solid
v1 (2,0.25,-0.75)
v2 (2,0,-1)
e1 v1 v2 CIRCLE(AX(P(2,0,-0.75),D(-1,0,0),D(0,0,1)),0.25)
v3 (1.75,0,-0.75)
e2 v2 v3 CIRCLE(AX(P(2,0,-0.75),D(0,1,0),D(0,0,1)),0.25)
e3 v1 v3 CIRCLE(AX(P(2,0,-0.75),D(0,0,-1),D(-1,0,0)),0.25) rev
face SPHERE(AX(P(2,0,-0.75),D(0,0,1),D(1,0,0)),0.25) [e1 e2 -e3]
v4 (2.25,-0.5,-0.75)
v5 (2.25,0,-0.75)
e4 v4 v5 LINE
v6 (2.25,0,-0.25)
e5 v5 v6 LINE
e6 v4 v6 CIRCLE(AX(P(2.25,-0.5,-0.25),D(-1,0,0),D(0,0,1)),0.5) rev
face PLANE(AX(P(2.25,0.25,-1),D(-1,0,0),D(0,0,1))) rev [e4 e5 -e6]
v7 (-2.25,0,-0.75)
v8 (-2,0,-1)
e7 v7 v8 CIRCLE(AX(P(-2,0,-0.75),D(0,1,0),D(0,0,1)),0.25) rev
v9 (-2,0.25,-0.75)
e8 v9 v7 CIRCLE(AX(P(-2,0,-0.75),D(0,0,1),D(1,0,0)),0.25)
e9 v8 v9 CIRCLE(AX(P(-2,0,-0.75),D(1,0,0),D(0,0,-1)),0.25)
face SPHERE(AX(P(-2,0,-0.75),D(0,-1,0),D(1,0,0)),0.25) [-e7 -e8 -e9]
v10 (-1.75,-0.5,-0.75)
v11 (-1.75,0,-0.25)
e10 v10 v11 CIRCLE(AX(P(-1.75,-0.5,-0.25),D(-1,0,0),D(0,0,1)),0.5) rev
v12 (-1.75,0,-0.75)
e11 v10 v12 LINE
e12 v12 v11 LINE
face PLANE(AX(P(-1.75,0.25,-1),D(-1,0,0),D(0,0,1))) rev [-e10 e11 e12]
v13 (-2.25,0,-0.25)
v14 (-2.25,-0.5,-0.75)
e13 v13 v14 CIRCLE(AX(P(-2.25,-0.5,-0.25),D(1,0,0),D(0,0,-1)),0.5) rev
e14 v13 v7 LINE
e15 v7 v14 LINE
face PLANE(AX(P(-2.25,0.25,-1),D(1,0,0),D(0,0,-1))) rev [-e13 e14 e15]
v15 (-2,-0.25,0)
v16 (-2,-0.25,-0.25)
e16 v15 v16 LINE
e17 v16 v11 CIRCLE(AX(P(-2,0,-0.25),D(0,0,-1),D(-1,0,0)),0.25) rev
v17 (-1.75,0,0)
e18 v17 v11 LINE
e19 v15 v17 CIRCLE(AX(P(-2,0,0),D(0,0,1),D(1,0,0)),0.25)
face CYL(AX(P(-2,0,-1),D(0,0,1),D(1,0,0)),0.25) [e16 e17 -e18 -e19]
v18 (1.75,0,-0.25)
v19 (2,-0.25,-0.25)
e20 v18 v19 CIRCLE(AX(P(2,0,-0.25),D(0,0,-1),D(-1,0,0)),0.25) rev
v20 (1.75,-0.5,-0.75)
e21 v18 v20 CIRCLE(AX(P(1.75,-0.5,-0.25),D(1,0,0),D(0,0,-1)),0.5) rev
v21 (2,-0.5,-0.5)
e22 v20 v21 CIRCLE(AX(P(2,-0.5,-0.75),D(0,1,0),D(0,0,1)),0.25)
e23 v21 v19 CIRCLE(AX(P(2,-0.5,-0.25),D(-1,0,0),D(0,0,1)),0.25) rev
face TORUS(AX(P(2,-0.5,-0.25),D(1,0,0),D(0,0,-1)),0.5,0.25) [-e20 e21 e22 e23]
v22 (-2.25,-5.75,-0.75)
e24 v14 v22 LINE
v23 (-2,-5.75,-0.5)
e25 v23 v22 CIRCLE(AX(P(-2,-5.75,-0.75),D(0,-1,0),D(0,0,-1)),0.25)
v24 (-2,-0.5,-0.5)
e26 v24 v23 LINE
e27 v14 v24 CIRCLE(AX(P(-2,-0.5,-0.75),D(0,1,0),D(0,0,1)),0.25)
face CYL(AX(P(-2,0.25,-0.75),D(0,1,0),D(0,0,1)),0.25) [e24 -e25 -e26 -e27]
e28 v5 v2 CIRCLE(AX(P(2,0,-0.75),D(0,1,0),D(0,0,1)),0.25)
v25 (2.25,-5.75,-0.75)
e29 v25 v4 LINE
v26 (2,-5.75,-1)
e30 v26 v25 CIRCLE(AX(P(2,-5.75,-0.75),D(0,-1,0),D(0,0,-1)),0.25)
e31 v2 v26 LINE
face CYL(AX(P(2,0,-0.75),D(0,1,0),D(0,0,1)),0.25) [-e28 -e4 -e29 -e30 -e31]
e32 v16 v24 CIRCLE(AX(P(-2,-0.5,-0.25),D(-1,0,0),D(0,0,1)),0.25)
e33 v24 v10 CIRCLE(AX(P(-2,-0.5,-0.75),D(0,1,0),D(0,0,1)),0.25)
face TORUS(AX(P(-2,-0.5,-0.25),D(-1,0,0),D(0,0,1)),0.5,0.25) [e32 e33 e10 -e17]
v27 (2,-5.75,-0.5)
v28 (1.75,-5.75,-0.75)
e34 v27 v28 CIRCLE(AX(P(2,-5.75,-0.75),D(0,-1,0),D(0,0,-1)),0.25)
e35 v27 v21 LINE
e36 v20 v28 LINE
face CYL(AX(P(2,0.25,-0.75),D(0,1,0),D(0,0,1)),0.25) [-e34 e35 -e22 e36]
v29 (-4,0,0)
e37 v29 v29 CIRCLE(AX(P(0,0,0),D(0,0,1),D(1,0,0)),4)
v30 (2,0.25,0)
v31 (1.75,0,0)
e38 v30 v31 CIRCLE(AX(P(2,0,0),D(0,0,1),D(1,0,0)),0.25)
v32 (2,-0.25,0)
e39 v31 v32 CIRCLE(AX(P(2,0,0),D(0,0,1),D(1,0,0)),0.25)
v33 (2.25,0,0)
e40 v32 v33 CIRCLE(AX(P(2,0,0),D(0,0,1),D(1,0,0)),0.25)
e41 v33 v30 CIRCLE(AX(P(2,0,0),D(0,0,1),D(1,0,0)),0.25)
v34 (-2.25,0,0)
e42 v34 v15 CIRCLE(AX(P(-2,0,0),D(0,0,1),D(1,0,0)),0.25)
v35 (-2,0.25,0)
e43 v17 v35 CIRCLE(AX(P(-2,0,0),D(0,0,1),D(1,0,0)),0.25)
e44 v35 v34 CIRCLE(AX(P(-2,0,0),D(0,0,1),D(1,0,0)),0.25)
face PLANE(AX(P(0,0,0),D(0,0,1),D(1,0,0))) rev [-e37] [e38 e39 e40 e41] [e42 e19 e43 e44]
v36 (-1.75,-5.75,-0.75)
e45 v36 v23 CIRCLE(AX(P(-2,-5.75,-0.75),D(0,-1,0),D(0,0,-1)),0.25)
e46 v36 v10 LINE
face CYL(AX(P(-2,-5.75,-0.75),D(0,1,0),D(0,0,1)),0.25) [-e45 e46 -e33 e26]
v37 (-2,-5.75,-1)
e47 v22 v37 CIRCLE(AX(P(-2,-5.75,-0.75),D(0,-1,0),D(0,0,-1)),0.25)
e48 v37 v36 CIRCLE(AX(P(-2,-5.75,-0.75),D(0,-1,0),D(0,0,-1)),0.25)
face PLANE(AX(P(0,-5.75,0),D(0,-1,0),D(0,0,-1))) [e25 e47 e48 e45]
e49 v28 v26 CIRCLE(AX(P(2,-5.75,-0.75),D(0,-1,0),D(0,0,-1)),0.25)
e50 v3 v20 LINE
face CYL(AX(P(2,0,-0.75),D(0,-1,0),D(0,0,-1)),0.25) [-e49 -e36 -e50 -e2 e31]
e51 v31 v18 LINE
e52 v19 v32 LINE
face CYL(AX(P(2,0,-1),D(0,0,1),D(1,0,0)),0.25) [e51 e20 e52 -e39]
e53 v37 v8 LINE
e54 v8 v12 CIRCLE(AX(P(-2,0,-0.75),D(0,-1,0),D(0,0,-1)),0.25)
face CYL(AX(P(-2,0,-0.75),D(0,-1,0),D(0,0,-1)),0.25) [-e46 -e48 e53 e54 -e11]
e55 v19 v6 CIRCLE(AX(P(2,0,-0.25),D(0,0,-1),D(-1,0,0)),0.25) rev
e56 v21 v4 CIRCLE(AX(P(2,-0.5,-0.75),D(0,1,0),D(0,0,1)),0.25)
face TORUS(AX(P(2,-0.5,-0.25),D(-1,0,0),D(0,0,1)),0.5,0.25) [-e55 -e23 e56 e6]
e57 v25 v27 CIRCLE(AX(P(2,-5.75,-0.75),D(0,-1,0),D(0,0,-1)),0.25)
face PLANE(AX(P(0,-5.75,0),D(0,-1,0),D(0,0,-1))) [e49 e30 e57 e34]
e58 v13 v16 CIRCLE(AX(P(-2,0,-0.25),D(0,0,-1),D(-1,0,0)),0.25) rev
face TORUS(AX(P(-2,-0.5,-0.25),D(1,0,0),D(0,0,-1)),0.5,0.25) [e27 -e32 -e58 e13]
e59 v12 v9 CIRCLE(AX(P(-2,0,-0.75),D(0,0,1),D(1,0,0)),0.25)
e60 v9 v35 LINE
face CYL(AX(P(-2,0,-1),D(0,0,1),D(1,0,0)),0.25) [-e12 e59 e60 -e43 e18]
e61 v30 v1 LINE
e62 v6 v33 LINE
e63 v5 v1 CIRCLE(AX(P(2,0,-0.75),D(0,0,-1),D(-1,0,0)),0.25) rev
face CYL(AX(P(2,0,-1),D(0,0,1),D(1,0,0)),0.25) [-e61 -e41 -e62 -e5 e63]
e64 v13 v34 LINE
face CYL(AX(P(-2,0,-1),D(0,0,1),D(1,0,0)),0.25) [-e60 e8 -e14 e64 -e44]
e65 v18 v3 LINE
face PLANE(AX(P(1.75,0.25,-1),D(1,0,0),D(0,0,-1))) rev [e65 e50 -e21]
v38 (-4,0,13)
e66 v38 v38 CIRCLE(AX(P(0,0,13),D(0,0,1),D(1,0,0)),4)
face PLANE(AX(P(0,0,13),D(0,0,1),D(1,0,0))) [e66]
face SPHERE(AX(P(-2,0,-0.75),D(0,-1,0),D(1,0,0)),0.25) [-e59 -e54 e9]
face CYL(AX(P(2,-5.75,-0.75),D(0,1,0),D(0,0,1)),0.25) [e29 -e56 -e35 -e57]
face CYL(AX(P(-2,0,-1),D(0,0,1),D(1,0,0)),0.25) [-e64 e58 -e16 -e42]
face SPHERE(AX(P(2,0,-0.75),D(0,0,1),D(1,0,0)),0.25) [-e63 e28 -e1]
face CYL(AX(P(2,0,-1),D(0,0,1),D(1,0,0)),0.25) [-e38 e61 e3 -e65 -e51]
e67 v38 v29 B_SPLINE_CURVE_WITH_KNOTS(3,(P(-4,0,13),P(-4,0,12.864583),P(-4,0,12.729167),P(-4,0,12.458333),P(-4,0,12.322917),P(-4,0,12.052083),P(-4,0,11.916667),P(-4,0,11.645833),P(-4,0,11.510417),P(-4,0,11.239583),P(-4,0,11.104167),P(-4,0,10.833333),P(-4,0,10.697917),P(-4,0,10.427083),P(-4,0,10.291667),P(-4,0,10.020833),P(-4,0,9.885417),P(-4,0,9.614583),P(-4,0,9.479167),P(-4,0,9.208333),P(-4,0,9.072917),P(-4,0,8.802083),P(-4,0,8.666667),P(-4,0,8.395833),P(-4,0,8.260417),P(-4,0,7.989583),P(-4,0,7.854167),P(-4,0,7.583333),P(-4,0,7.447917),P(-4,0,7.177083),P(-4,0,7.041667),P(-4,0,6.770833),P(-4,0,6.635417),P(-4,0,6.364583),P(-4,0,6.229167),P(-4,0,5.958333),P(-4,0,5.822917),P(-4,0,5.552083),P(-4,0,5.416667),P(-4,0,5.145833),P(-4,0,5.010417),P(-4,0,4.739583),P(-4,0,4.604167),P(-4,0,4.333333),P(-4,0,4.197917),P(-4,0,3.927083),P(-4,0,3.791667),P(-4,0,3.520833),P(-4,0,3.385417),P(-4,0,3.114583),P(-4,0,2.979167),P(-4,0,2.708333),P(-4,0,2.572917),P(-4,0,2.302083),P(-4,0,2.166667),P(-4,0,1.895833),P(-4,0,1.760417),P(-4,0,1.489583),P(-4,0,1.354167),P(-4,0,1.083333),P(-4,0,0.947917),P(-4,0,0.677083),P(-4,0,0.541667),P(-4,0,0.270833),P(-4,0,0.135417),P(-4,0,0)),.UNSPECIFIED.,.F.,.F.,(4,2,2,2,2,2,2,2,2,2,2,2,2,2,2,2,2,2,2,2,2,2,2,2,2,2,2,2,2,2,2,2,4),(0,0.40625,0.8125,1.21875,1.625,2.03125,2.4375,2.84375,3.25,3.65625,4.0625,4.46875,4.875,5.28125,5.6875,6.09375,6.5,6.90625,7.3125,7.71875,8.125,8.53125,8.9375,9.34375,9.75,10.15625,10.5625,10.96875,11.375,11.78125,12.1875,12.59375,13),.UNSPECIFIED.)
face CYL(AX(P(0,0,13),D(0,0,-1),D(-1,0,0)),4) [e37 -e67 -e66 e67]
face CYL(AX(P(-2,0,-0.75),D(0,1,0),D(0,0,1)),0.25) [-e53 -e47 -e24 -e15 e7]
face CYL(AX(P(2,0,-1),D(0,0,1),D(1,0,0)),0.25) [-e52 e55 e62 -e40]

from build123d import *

# Parameters (mm, degrees)
SKETCH_1_R      = 4
EXTRUDE_1_DEPTH = 13
SKETCH_2_W      = 0.5
SKETCH_2_H      = 0.5
EXTRUDE_2_DEPTH = 1
SKETCH_3_W      = 0.5
SKETCH_3_H      = 0.5
EXTRUDE_3_DEPTH = 5.5
FILLET_1_R      = 0.25
FILLET_2_R      = 0.25


with BuildPart() as part:
    # Эскиз1 → Бобышка-Вытянуть1 (new body)
    with BuildSketch(Plane.XY):
        with Locations(Location((0, 0, 0), (0, 0, 180))):
            Circle(SKETCH_1_R)
    extrude(amount=EXTRUDE_1_DEPTH)

    # Эскиз2 → Бобышка-Вытянуть2 (add)
    with BuildSketch(Plane(origin=(0, 0, 0), x_dir=(-1, 0, 0), z_dir=(0, 0, -1))):
        with Locations((2, 0)):
            Rectangle(SKETCH_2_W, SKETCH_2_H)
        with Locations((-2, 0)):
            Rectangle(SKETCH_2_W, SKETCH_2_H)
    extrude(amount=EXTRUDE_2_DEPTH)

    # Эскиз3 → Бобышка-Вытянуть3 (add)
    with BuildSketch(Plane.XZ.offset(0.25)):
        with Locations((-2, -0.75)):
            Rectangle(SKETCH_3_W, SKETCH_3_H)
        with Locations((2, -0.75)):
            Rectangle(SKETCH_3_W, SKETCH_3_H)
    extrude(amount=EXTRUDE_3_DEPTH)

    # Скругление1
    fillet_1_edges = [part.edges().sort_by_distance(p)[0] for p in [
        (-1.75, -2.75, -1),
        (-2.25, -2.75, -1),
    ]]
    fillet(fillet_1_edges, radius=FILLET_1_R - 0.0001)  # a hair under: the kernel refuses the full size

    # Скругление2
    fillet_2_edges = [part.edges().sort_by_distance(p)[0] for p in [
        (-1.75, -0.25, -0.25),
        (-2.25, -0.25, -0.25),
        (-2.25, -3, -0.5),
        (-2, -0.25, -0.5),
        (-1.75, -3, -0.5),
        (1.75, -0.25, -0.25),
        (2.25, -0.25, -0.25),
        (1.75, -3, -0.5),
        (2, -0.25, -0.5),
        (2.25, -3, -0.5),
        (-1.75, 0.25, -0.37505),
        (-2.25, 0.25, -0.37505),
        (-2.176805985, 0.25, -0.926805985),
        (-1.823194015, 0.25, -0.926805985),
        (1.75, 0.25, -0.5),
        (2.25, 0.25, -0.5),
        (1.75, -2.75, -1),
        (2, 0.25, -1),
        (2.25, -2.75, -1),
    ]]
    fillet(fillet_2_edges, radius=FILLET_2_R - 0.0001)  # a hair under: the kernel refuses the full size


solid = part.part
